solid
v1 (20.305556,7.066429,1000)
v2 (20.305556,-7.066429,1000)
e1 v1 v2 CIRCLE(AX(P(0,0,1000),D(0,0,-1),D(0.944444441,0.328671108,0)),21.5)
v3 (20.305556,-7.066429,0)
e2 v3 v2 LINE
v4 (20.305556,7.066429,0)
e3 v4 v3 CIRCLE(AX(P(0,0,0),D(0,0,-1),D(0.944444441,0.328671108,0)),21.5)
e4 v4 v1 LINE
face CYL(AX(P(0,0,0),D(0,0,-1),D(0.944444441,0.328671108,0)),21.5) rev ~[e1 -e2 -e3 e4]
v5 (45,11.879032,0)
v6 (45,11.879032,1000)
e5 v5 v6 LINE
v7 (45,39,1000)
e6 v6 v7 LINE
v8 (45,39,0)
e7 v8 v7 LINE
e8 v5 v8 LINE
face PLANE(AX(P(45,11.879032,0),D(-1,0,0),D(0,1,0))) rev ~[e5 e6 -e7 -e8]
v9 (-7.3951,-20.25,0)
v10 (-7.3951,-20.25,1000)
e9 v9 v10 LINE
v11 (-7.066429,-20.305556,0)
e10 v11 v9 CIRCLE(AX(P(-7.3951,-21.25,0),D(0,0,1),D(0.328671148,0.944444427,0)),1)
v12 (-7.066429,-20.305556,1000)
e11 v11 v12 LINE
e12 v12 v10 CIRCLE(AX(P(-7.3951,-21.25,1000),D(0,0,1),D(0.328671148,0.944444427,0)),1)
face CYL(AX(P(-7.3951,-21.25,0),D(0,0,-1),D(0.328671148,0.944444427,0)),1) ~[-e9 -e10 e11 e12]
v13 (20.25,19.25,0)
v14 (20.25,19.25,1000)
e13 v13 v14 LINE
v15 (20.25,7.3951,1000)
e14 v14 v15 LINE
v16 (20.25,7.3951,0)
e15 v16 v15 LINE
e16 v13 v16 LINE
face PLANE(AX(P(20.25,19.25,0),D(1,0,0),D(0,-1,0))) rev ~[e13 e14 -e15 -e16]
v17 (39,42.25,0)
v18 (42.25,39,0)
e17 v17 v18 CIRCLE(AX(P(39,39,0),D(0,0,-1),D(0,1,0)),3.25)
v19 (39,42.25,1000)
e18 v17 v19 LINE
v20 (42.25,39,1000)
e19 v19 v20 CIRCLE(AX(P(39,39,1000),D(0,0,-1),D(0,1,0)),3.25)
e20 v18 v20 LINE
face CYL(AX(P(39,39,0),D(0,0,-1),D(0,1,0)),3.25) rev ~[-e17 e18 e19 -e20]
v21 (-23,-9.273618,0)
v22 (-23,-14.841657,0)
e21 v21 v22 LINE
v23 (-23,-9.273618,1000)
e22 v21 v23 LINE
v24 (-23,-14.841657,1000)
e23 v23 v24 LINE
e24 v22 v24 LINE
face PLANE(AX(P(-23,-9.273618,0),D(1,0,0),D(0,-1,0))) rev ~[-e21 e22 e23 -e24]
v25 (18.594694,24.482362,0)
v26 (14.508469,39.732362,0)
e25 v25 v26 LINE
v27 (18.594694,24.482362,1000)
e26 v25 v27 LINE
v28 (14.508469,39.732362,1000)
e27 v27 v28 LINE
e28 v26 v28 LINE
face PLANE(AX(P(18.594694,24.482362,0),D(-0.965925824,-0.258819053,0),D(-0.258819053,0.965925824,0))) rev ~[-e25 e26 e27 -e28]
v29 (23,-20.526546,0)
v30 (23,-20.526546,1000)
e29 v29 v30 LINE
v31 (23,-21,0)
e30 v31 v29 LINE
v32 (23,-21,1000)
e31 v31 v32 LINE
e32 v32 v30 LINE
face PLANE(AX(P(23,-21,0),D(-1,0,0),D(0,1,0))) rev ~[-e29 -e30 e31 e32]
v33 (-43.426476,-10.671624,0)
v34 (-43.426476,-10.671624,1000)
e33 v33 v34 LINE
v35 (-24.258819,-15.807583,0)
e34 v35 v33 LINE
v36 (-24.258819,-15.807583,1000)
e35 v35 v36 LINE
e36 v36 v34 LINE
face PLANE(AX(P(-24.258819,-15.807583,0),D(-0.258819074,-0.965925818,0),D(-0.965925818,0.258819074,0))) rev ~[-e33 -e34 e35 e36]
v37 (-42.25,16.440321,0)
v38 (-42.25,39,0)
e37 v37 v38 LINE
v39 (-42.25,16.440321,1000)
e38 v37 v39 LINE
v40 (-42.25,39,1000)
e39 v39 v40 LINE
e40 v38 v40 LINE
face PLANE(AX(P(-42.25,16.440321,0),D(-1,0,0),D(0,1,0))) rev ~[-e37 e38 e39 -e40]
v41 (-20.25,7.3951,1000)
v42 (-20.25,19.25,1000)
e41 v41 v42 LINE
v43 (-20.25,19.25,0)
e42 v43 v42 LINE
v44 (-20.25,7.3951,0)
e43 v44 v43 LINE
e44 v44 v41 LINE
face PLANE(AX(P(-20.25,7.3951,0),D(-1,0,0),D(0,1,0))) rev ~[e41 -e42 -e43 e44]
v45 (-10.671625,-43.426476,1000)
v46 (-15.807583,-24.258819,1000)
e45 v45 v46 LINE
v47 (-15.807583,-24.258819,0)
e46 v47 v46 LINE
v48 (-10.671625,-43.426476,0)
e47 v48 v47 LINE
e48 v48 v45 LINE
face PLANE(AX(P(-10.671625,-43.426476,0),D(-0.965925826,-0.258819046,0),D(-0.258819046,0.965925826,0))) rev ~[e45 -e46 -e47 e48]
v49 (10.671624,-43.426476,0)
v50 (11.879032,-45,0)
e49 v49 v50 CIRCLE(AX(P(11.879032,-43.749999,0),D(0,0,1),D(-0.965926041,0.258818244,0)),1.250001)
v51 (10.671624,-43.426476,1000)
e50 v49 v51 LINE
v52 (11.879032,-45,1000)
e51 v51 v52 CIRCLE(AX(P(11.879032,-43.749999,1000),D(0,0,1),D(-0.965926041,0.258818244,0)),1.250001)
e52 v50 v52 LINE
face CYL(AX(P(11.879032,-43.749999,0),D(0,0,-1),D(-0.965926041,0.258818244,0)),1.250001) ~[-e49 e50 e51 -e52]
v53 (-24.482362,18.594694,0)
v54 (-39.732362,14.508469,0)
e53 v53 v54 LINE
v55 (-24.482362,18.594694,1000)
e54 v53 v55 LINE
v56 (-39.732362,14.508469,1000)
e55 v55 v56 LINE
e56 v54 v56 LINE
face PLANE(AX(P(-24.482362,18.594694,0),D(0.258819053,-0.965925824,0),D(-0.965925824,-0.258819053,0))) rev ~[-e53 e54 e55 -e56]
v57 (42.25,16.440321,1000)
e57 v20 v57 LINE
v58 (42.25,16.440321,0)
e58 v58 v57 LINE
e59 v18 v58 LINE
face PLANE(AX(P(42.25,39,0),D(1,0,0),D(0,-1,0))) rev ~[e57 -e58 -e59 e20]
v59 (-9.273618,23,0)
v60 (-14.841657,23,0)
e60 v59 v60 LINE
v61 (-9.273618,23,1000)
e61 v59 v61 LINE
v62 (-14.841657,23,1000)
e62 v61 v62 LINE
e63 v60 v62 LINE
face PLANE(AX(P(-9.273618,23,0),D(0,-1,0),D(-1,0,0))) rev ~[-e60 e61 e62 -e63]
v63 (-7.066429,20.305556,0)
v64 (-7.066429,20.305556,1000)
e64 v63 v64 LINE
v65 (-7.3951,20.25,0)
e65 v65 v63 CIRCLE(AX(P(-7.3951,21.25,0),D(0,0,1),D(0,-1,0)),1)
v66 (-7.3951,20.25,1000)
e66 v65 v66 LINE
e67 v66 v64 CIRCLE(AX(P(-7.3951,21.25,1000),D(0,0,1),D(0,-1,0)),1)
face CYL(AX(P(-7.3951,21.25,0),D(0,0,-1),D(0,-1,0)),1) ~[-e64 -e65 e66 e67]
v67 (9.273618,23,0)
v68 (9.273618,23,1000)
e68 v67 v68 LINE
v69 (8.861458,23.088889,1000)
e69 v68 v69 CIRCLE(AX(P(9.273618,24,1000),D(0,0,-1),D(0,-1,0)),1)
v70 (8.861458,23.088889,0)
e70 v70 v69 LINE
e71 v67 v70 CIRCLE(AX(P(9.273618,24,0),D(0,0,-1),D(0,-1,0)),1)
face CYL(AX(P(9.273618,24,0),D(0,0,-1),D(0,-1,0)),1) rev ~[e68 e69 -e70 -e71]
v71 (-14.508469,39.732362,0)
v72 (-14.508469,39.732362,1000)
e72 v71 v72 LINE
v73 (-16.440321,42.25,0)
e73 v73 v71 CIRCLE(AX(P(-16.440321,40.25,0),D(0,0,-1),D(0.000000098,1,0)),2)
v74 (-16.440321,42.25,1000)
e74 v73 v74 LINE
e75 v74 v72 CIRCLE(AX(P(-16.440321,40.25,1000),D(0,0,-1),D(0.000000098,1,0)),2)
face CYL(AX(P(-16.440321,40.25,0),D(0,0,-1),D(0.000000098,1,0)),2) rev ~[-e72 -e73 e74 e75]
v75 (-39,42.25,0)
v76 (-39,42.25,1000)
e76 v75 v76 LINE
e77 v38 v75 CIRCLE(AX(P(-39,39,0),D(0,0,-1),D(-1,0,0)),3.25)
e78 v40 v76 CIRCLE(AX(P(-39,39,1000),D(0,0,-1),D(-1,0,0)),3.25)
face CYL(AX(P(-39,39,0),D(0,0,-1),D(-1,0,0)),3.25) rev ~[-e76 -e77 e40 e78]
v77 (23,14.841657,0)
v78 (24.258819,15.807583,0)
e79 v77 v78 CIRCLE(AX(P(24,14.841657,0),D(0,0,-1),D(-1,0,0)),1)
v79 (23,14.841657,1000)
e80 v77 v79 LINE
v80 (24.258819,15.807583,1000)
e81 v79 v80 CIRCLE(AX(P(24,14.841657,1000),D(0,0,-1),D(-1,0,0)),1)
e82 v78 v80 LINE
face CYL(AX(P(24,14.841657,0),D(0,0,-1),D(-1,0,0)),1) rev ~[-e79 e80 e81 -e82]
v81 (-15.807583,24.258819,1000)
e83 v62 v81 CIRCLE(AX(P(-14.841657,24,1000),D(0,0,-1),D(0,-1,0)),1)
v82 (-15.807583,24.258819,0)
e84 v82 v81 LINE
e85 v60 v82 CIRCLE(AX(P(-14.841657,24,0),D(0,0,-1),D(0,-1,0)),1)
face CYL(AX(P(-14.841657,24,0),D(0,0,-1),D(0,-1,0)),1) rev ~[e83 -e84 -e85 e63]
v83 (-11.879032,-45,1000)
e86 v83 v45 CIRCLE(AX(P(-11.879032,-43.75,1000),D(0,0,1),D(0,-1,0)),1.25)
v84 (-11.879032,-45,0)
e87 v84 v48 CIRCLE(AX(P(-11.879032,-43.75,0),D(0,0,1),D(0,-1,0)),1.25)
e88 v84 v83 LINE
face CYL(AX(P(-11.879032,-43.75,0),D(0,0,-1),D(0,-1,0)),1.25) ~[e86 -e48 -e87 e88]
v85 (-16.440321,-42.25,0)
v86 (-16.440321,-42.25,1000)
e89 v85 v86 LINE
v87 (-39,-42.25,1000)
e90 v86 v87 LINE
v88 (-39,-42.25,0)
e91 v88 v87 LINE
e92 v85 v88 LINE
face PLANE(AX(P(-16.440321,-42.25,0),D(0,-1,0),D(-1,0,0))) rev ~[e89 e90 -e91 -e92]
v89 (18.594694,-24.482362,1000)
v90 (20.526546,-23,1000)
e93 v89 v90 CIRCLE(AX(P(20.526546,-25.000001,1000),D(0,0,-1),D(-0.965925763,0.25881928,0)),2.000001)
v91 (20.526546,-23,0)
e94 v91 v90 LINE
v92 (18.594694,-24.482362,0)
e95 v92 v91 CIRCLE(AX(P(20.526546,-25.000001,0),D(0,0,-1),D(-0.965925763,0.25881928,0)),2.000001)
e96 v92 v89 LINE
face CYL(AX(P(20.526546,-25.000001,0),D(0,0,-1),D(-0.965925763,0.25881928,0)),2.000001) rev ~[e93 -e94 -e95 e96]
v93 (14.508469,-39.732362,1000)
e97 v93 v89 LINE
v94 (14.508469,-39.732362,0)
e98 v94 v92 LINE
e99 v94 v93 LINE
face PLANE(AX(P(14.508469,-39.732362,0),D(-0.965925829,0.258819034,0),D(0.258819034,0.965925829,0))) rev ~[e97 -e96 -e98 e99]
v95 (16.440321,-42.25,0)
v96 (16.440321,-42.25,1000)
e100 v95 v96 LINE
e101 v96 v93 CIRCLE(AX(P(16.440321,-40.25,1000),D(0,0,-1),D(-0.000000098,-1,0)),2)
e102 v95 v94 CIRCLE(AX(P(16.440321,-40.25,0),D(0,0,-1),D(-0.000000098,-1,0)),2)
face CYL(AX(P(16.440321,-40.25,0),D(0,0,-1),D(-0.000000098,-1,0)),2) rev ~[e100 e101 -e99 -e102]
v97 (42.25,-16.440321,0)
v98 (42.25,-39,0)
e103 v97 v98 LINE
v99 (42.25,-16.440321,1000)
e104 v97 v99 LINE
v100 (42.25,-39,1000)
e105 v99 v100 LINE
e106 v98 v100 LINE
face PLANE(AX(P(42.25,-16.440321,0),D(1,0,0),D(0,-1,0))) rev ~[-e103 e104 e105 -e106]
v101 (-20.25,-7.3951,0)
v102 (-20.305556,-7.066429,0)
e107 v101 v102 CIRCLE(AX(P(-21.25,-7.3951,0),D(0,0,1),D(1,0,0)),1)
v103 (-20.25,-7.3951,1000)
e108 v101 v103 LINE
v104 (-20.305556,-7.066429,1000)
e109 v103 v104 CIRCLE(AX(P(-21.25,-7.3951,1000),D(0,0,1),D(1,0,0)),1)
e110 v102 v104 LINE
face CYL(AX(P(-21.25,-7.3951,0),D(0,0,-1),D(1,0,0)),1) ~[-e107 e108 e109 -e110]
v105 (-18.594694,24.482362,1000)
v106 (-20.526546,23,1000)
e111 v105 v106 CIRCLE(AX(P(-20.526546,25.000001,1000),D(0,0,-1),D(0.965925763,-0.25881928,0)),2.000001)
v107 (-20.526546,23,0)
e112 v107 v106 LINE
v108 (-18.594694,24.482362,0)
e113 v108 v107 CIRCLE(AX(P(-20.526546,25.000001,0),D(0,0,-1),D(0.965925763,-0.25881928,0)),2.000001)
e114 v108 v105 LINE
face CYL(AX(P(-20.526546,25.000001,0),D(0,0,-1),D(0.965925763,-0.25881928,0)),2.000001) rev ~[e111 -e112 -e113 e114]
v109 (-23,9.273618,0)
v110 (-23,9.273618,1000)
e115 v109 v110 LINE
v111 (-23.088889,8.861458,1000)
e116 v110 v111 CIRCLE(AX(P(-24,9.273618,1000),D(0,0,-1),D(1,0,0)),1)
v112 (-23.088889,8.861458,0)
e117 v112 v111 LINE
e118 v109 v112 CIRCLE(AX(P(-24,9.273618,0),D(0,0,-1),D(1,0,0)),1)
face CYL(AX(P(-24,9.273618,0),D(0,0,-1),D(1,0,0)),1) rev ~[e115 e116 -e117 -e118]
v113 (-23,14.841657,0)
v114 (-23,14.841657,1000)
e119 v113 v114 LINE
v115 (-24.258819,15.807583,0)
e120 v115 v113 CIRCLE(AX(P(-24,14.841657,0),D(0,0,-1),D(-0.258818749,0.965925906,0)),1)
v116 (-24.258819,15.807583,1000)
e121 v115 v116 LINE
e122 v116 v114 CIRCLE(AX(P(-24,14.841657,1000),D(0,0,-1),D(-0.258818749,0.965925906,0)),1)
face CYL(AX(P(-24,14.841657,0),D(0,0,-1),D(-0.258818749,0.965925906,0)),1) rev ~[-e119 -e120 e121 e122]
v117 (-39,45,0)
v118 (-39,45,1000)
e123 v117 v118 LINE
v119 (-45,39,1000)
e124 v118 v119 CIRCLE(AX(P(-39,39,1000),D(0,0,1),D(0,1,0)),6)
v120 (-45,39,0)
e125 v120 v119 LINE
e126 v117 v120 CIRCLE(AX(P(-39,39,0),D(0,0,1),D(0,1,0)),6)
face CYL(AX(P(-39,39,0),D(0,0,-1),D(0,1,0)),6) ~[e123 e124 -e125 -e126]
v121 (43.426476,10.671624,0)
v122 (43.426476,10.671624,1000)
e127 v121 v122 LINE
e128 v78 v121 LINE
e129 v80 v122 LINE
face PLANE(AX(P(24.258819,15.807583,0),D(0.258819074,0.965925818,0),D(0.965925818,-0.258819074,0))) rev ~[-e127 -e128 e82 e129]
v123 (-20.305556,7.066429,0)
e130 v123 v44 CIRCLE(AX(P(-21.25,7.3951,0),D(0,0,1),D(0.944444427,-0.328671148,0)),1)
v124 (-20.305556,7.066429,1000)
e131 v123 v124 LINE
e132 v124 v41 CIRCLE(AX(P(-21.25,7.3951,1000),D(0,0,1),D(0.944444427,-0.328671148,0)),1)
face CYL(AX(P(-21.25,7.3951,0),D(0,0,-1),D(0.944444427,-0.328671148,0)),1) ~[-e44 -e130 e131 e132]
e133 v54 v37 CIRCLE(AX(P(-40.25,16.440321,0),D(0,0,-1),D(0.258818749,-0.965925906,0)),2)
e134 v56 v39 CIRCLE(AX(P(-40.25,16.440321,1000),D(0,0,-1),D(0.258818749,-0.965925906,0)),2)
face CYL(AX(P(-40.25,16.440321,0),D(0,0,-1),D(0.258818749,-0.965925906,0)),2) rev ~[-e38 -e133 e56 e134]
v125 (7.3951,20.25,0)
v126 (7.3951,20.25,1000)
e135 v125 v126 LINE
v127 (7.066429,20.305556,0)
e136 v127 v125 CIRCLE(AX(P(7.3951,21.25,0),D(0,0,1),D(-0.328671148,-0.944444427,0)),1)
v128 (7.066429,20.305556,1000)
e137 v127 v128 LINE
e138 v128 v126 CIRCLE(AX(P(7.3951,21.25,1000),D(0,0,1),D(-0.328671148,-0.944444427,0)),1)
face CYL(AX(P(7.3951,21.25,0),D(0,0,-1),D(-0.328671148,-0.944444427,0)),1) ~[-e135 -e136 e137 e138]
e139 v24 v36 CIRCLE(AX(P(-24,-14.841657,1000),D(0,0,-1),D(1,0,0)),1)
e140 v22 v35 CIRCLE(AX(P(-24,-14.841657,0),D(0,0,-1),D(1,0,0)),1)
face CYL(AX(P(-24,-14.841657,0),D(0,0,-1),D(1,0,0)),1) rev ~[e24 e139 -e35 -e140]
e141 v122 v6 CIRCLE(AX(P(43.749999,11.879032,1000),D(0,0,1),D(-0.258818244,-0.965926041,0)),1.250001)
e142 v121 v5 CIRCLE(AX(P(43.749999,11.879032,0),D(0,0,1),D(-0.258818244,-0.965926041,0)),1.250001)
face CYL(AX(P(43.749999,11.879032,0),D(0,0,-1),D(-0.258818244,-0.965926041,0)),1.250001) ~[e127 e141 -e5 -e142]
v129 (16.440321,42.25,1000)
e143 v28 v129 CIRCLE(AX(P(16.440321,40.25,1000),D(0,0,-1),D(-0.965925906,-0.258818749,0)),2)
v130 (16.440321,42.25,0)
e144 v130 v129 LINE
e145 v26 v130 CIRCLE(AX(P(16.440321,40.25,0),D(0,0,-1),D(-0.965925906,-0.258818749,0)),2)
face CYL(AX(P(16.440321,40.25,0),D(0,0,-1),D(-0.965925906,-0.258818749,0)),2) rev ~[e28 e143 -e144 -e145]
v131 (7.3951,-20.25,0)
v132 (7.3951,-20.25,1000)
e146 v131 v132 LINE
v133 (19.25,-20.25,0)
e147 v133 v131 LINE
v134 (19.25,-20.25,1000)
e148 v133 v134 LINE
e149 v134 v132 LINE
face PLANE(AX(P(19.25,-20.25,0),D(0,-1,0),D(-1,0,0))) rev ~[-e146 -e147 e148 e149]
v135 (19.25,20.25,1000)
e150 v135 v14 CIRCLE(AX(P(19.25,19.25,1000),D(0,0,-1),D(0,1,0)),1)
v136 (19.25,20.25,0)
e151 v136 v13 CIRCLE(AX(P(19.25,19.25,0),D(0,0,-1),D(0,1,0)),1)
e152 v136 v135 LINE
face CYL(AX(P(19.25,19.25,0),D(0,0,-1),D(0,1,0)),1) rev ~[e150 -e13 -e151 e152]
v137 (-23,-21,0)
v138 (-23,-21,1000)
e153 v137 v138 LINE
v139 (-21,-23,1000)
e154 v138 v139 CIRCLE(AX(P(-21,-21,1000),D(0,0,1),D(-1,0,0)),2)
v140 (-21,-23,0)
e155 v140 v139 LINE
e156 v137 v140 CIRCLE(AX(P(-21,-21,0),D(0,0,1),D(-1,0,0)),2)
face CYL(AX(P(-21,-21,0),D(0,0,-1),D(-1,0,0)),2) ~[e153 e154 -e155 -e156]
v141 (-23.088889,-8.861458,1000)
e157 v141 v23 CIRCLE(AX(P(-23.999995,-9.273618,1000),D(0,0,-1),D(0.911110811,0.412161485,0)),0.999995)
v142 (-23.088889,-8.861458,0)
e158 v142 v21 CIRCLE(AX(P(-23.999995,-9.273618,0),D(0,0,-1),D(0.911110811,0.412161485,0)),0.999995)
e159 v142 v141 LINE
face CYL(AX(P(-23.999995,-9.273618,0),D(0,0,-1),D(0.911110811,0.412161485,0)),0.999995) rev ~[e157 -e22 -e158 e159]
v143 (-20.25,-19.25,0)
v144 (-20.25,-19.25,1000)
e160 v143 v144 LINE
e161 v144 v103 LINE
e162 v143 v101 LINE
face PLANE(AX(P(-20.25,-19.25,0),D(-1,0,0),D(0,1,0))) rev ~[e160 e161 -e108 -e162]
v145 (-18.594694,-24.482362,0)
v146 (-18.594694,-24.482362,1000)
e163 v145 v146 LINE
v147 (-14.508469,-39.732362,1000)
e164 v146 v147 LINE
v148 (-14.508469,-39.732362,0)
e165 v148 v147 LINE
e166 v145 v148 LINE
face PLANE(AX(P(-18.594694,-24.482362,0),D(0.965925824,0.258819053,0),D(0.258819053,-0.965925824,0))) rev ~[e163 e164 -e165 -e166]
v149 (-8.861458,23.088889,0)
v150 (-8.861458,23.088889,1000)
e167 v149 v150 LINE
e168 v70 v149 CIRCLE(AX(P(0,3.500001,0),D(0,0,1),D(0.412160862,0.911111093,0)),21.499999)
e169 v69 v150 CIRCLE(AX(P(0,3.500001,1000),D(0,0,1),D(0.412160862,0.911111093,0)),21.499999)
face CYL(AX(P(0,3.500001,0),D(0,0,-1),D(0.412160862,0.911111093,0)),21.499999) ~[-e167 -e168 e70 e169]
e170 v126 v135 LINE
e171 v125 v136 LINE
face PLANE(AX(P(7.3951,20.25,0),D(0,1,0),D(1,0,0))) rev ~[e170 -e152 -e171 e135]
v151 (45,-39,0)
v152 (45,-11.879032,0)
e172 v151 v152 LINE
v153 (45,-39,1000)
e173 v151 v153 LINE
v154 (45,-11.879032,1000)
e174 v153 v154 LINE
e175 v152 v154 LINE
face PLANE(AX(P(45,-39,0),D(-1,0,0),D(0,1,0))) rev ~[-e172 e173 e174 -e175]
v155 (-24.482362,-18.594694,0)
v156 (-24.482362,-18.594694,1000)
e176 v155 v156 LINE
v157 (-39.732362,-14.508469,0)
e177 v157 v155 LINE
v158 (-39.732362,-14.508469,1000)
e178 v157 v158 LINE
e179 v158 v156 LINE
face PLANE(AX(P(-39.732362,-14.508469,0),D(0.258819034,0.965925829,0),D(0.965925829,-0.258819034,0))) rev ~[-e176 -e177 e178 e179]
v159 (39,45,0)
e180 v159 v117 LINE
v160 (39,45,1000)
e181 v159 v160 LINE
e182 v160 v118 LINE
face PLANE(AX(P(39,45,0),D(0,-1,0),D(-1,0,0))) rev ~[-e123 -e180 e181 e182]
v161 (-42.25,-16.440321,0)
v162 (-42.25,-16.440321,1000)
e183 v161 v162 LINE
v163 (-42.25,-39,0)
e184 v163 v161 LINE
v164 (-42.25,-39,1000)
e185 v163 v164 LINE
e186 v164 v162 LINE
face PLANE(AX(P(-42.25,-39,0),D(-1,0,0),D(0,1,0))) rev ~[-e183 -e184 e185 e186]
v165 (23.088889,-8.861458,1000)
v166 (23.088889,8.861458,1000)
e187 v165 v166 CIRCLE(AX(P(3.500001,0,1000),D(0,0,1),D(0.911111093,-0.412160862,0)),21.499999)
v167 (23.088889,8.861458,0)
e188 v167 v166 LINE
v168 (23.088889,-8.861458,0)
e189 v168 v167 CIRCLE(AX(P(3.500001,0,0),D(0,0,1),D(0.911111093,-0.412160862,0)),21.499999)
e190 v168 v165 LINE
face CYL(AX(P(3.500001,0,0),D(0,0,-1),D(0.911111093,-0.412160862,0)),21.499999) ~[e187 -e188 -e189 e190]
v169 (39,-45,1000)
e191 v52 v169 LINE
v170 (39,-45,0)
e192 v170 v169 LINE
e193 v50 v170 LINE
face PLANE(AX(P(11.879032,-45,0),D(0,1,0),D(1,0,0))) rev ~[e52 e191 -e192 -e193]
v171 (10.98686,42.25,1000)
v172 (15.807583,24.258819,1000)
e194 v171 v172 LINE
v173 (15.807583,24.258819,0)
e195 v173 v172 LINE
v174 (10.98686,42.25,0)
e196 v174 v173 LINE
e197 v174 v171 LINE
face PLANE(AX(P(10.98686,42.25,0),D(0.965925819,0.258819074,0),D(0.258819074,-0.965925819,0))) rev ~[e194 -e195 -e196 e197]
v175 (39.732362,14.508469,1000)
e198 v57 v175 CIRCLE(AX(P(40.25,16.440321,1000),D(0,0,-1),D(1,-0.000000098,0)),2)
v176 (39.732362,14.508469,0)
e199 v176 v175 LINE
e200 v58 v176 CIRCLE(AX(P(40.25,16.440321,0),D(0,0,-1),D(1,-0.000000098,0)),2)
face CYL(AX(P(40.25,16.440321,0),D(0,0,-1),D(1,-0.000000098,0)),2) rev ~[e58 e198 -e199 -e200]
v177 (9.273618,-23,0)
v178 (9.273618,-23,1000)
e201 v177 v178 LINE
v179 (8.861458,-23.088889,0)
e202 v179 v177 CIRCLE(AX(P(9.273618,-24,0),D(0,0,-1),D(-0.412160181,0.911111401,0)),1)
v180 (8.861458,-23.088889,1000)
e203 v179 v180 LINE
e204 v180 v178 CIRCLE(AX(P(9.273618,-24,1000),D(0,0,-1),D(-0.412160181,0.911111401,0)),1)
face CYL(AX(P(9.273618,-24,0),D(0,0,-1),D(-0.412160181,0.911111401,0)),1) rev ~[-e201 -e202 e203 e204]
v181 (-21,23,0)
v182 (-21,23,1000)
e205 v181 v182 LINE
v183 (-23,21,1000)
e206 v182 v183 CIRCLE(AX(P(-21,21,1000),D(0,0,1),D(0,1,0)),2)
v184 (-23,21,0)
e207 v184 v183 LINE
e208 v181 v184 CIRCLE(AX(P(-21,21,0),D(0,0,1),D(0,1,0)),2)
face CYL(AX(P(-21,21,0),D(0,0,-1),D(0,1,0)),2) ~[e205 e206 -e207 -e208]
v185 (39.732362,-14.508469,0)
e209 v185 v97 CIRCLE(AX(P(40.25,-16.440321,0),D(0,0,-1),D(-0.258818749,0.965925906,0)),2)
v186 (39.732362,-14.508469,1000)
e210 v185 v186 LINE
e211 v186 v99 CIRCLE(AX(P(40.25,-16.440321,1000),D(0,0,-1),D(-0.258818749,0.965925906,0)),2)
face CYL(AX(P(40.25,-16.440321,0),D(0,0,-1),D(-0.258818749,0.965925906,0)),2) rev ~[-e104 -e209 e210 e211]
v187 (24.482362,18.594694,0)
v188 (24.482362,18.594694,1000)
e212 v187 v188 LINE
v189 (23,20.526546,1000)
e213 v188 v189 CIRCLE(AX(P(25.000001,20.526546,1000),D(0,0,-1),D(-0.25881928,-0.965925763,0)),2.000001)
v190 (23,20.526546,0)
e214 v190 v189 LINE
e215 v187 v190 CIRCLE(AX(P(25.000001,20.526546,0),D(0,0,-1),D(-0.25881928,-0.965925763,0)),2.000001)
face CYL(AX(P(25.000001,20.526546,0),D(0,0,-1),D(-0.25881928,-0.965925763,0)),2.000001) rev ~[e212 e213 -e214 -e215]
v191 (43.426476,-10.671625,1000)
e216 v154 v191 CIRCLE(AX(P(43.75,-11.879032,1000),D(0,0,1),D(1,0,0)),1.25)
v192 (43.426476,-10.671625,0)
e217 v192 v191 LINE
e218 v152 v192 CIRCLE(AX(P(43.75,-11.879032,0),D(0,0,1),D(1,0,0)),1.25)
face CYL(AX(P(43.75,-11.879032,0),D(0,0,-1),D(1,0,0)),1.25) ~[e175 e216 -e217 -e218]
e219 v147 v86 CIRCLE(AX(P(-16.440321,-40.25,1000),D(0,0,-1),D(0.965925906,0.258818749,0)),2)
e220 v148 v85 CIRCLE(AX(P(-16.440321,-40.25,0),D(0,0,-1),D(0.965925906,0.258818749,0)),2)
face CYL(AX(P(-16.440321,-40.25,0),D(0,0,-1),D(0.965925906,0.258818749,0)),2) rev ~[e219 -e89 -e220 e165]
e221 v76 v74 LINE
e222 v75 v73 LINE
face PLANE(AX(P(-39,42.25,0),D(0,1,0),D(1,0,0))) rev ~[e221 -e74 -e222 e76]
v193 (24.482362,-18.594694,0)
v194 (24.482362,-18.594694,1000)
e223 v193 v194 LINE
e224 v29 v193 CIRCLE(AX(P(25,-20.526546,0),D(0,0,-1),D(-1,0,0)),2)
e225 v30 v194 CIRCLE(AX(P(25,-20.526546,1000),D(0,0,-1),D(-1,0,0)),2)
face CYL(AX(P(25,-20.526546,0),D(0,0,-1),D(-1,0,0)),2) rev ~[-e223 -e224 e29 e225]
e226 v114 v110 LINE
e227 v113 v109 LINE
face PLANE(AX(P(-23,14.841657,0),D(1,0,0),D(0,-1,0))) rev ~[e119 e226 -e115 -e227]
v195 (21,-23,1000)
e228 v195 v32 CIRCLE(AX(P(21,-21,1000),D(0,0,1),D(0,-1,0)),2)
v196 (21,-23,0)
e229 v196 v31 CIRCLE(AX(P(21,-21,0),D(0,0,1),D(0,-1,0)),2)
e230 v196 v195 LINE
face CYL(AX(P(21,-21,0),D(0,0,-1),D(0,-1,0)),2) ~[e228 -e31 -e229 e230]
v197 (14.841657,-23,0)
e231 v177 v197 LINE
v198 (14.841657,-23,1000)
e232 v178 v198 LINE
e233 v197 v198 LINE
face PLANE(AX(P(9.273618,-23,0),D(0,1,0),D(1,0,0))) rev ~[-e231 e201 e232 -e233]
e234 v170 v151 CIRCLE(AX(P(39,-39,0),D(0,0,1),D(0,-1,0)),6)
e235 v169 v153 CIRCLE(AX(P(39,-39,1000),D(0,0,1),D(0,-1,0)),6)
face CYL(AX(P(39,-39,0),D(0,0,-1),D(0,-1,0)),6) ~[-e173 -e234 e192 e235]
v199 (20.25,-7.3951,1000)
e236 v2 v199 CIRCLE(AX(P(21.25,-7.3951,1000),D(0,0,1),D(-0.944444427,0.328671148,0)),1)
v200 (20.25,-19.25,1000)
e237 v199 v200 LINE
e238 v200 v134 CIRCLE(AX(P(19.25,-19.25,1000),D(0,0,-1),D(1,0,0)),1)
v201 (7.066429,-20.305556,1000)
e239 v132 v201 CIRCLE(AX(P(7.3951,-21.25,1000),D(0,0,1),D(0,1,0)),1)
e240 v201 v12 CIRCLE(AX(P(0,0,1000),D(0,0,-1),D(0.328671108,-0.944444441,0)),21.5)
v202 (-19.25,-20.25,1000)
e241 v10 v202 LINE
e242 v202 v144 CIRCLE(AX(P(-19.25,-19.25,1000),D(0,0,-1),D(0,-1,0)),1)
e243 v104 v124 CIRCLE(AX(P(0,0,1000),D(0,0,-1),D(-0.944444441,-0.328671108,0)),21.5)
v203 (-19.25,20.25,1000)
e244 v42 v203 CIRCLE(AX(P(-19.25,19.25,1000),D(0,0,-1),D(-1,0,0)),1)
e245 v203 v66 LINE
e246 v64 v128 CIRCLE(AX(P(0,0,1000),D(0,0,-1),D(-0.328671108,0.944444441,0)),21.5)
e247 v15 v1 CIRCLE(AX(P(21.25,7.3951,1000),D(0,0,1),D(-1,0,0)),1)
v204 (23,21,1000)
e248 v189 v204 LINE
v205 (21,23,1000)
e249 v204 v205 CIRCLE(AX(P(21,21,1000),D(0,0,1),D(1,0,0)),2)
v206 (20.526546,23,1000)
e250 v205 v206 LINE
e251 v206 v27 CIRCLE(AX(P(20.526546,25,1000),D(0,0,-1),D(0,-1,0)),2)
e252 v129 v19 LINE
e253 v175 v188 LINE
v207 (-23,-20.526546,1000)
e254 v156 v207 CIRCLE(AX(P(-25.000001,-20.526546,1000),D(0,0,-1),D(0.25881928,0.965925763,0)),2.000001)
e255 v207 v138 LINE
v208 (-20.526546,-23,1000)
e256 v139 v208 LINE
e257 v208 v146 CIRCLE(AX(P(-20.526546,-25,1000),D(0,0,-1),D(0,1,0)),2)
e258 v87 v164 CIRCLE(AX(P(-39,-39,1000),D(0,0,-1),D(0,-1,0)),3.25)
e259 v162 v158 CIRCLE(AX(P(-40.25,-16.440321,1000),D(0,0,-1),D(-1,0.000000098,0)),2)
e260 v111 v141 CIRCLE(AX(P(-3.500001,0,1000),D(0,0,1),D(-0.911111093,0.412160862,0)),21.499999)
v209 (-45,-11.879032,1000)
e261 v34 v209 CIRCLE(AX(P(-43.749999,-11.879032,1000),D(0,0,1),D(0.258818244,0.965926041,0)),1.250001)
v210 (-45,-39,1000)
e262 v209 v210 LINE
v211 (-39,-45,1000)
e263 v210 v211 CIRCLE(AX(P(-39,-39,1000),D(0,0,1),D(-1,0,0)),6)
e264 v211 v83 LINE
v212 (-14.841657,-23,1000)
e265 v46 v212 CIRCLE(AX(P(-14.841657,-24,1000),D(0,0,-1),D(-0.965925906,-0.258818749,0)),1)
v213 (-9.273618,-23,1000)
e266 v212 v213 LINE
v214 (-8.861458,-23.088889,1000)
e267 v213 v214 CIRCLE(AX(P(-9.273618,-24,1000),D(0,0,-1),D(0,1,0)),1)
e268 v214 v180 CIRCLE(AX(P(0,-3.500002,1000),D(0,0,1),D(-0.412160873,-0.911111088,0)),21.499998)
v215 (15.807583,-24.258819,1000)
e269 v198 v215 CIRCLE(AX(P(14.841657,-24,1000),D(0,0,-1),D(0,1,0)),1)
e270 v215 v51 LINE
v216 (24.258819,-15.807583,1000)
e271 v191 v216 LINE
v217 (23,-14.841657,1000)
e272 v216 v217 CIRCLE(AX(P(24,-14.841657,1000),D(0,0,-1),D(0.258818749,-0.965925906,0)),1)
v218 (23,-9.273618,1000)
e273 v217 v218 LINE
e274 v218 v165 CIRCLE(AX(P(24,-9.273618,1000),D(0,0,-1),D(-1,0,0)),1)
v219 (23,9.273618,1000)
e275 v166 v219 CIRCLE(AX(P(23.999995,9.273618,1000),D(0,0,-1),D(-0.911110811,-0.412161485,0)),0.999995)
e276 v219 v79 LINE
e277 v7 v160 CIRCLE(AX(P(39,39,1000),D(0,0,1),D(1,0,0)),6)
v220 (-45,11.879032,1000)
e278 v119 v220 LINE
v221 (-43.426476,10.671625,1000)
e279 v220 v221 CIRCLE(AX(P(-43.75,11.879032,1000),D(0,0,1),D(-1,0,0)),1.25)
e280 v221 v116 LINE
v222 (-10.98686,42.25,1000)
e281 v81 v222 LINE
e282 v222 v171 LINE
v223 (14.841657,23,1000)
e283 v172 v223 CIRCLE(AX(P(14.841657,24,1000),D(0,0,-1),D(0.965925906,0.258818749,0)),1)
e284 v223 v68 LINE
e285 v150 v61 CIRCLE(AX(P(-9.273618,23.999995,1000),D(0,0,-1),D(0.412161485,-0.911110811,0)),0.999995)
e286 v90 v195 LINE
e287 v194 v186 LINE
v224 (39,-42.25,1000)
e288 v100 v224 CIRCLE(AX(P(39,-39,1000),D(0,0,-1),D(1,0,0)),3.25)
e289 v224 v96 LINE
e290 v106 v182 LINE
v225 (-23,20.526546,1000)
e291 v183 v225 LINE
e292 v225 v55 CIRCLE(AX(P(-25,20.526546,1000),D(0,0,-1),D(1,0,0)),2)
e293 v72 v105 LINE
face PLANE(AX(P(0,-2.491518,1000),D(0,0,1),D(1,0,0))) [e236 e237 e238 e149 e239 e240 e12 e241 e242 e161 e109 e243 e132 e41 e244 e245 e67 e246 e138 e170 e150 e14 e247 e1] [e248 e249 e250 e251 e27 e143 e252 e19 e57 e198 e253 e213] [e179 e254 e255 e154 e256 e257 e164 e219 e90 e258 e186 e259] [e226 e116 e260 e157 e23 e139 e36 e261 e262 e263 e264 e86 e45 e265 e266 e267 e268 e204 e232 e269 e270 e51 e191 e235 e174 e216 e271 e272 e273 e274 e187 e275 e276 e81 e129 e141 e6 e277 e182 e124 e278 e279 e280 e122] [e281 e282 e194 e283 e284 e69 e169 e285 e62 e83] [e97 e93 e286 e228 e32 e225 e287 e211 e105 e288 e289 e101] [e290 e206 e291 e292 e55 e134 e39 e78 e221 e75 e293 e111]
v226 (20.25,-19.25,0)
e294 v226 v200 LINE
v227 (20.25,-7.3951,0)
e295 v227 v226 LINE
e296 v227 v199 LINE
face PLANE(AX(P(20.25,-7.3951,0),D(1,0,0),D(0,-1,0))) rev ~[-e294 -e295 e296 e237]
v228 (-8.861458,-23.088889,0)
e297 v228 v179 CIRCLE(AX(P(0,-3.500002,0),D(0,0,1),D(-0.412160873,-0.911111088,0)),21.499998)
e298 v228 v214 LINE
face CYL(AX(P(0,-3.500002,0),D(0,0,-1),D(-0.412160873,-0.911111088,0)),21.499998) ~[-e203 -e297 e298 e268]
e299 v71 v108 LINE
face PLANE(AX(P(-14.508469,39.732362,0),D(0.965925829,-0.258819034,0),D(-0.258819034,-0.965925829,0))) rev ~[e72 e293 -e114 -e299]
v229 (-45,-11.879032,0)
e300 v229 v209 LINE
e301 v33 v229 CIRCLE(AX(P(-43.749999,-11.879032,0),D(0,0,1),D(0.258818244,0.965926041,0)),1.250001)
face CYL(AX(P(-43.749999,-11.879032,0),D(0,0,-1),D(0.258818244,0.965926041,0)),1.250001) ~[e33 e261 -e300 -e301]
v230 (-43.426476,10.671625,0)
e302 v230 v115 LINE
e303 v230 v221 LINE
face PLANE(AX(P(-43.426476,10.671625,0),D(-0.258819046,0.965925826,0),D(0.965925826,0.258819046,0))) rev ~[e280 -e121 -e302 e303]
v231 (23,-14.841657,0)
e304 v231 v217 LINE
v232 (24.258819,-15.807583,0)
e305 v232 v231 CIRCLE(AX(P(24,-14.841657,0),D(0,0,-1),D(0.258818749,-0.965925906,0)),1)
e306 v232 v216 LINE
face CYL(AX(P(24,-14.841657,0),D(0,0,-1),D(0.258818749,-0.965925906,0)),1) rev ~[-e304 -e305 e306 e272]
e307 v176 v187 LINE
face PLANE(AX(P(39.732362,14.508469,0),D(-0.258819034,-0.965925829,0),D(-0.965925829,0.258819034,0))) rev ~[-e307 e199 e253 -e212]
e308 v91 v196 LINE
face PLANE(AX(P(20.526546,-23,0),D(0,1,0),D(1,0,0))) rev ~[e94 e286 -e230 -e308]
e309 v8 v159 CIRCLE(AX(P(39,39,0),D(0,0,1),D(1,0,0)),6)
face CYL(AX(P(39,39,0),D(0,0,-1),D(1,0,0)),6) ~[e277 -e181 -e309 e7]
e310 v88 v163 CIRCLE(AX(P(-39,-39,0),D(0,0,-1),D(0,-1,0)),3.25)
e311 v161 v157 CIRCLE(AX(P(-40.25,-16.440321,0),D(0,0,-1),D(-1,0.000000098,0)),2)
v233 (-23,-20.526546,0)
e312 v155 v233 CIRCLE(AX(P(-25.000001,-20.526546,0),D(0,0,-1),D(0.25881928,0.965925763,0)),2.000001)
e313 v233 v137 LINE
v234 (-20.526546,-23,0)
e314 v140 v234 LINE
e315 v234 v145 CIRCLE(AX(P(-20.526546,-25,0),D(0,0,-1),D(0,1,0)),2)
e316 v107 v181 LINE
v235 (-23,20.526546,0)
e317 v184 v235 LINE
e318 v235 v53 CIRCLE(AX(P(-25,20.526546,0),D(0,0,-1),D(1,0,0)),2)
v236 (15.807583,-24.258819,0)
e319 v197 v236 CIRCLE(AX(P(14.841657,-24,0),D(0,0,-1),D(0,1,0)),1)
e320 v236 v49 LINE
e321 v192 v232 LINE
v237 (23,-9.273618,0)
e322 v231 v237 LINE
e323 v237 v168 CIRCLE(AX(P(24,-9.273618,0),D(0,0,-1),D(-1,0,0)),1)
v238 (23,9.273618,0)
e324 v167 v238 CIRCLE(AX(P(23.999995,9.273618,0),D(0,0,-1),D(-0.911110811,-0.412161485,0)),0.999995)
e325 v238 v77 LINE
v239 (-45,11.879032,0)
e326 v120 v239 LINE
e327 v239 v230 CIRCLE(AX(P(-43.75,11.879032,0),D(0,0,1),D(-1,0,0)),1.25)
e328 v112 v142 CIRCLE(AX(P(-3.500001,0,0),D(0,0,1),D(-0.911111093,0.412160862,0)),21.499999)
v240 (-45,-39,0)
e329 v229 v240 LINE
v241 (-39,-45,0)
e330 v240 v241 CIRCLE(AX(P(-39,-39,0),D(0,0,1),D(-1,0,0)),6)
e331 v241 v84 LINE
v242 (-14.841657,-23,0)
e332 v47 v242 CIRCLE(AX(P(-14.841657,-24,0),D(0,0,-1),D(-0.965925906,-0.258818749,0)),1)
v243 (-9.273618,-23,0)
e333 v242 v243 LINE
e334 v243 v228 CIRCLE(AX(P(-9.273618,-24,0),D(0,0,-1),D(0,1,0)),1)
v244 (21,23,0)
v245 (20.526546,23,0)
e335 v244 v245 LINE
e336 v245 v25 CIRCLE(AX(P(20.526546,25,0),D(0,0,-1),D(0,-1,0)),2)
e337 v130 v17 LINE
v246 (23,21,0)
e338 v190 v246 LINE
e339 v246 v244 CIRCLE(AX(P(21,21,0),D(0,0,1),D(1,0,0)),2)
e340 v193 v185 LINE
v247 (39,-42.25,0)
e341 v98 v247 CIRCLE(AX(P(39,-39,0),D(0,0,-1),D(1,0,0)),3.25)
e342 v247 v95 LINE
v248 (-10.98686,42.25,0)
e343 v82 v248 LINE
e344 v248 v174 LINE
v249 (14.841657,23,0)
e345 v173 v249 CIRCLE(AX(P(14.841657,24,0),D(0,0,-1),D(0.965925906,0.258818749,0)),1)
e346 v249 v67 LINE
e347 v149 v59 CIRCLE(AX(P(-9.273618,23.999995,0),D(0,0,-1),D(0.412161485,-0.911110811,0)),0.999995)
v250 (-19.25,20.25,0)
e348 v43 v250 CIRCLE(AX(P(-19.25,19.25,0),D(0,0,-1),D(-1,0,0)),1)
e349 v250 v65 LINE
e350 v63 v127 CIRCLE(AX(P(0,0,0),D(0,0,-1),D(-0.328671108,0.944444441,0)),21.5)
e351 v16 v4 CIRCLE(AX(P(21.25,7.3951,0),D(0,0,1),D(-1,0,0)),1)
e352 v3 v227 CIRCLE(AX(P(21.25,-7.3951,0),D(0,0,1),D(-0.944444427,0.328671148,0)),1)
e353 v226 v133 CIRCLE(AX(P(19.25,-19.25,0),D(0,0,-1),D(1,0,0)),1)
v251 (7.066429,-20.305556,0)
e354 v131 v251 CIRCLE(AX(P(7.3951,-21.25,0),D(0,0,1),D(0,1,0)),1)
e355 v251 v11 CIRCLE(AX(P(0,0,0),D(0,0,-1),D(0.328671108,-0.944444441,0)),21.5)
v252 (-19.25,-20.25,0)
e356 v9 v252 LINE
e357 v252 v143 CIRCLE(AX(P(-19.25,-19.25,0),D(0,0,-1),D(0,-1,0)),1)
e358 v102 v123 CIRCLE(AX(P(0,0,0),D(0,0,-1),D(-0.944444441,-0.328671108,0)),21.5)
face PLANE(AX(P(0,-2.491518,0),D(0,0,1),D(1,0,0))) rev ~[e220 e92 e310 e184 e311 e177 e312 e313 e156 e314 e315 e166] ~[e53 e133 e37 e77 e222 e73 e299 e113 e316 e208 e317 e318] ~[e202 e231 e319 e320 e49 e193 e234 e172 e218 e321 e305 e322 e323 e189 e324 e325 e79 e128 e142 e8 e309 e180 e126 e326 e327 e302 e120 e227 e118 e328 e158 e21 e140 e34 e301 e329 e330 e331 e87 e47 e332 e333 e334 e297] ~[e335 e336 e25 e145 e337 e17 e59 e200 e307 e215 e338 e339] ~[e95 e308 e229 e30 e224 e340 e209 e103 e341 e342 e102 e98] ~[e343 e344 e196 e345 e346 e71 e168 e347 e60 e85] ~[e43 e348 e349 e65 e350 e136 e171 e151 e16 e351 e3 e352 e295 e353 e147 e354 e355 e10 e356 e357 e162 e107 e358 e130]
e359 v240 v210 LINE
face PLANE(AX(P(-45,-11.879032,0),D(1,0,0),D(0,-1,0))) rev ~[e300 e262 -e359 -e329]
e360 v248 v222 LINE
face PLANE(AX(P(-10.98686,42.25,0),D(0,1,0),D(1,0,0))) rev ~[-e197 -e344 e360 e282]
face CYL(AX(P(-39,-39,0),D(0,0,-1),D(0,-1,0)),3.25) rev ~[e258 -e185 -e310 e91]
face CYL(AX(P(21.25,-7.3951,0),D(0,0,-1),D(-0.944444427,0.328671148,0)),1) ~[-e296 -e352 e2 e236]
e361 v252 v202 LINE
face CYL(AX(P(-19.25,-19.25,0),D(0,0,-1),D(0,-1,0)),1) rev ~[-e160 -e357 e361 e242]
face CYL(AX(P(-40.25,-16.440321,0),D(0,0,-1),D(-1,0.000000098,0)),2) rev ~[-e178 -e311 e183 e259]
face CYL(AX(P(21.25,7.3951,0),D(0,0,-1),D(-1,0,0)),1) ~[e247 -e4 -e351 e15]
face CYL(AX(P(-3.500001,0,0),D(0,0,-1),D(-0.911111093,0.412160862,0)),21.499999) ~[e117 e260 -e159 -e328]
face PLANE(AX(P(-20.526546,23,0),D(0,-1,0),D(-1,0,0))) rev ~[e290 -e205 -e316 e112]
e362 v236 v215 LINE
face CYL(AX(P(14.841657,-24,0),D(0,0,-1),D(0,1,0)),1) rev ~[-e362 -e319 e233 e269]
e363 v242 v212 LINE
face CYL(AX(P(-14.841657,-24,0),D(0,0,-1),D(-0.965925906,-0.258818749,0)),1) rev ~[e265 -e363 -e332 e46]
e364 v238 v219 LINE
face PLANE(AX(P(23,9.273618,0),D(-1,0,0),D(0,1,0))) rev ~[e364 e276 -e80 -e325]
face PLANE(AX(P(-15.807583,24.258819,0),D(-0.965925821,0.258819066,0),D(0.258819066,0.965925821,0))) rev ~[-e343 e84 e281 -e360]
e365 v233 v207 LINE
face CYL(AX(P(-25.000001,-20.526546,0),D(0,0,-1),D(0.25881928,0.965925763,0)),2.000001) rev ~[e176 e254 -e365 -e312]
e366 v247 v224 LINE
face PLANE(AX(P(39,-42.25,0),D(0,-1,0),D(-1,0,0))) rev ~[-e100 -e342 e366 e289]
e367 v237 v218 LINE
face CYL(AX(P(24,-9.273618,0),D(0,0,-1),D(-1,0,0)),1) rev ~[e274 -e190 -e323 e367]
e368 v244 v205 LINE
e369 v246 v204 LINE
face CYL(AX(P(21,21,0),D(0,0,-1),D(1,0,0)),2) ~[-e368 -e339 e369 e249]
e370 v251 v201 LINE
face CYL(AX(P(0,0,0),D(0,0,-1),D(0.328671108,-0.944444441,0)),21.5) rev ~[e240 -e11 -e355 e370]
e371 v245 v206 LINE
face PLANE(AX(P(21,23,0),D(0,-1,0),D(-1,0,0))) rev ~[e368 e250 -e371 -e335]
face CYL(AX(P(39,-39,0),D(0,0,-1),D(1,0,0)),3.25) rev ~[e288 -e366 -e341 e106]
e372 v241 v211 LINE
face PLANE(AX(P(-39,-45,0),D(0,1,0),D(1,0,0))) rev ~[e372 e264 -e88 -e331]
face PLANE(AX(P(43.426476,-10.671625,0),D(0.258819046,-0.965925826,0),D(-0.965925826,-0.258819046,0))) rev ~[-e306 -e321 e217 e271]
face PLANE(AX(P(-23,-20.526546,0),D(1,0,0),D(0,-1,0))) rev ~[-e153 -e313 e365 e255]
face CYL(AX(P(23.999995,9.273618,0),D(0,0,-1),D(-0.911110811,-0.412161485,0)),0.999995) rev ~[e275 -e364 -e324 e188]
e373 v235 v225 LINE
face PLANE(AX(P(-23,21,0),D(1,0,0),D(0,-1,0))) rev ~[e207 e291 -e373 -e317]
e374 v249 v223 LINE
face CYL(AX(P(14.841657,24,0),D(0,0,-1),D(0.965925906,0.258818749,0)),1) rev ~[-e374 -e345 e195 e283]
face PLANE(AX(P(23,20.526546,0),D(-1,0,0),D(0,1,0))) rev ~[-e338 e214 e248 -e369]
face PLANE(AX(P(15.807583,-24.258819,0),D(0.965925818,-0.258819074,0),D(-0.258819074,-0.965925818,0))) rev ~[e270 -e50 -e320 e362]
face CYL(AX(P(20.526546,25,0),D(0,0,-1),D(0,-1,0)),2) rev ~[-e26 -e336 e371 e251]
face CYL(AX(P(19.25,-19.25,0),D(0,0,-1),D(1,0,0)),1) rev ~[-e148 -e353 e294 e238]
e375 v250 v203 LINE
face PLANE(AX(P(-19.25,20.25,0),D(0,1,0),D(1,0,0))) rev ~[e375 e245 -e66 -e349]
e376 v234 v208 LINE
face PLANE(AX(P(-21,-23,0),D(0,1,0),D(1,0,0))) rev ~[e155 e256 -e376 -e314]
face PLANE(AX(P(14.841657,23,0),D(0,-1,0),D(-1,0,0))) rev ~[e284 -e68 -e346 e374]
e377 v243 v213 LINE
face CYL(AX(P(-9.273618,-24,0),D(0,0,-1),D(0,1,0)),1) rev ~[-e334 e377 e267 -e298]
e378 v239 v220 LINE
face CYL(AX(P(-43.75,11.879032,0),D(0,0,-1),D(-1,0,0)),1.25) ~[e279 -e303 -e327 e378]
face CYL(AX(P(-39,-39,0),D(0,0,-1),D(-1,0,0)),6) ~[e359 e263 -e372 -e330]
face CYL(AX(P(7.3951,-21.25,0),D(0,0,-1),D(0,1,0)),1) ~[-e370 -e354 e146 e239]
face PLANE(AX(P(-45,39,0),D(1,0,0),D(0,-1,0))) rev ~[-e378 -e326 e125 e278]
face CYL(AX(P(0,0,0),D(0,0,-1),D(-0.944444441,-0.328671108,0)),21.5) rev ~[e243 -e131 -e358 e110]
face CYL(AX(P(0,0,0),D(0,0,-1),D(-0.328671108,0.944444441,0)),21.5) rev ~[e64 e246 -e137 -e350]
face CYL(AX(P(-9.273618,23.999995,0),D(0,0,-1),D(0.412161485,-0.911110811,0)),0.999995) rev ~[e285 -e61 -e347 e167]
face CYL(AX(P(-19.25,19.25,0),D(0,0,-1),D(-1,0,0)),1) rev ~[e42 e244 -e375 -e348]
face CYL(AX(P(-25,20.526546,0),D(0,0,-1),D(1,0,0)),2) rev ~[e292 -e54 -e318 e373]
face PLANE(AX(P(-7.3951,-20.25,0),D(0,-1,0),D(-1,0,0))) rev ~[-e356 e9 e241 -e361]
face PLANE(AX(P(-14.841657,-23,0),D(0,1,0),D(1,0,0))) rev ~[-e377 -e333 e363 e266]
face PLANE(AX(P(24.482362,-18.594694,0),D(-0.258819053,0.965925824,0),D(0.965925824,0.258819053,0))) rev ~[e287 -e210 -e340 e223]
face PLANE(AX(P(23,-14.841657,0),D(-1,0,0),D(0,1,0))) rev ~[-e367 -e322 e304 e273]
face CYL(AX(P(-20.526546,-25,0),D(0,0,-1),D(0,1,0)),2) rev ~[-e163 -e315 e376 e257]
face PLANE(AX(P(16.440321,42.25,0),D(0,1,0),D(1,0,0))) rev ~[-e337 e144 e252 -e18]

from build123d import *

# Parameters (mm, degrees)
F1_DEPTH = 1000


# Not quite as in the source:
# - ends of sketch curves that miss each other by under 0.0002 mm in the source are joined


with BuildPart() as f1:
    # F0 (on Top) → F1 (new body)
    with BuildSketch(Plane.XY):
        with BuildLine():
            ThreePointArc((8.8614578186, -23.0888885991), (9.062799833, -23.022474706), (9.273618, -23))
            Line((9.273618, -23), (14.841657, -23))
            ThreePointArc((14.841657, -23), (15.6350103133, -23.3912385359), (15.8075828492, -24.2588189596))
            Line((15.8075828492, -24.2588189596), (10.671624, -43.426476))
            ThreePointArc((10.671624, -43.426476), (10.8873403242, -44.5109517857), (11.879032, -45))
            Line((11.879032, -45), (39, -45))
            ThreePointArc((39, -45), (43.2426406871, -43.2426406871), (45, -39))
            Line((45, -39), (45, -11.879032))
            ThreePointArc((45, -11.879032), (44.5109517857, -10.8873403242), (43.4264761923, -10.6716247175))
            Line((43.4264761923, -10.6716247175), (24.258819, -15.807583))
            ThreePointArc((24.258819, -15.807583), (23.3912385359, -15.6350103133), (23, -14.841657))
            Line((23, -14.841657), (23, -9.273618))
            ThreePointArc((23, -9.273618), (23.022474706, -9.062799833), (23.0888885991, -8.8614578186))
            ThreePointArc((23.0888885991, -8.8614578186), (25, 0), (23.0888887851, 8.8614579028))
            ThreePointArc((23.0888887851, 8.8614579028), (23.022474706, 9.062799833), (23, 9.273618))
            Line((23, 9.273618), (23, 14.841657))
            ThreePointArc((23, 14.841657), (23.3912385359, 15.6350103133), (24.2588189596, 15.8075828492))
            Line((24.2588189596, 15.8075828492), (43.426476, 10.671624))
            ThreePointArc((43.426476, 10.671624), (44.5109517857, 10.8873403242), (45, 11.879032))
            Line((45, 11.879032), (45, 39))
            ThreePointArc((45, 39), (43.2426406871, 43.2426406871), (39, 45))
            Line((39, 45), (-39, 45))
            ThreePointArc((-39, 45), (-43.2426406871, 43.2426406871), (-45, 39))
            Line((-45, 39), (-45, 11.879032))
            ThreePointArc((-45, 11.879032), (-44.5109517857, 10.8873403242), (-43.4264761923, 10.6716247175))
            Line((-43.4264761923, 10.6716247175), (-24.258819, 15.807583))
            ThreePointArc((-24.258819, 15.807583), (-23.3912385359, 15.6350103133), (-23, 14.841657))
            Line((-23, 14.841657), (-23, 9.273618))
            ThreePointArc((-23, 9.273618), (-23.022474706, 9.062799833), (-23.0888885991, 8.8614578186))
            ThreePointArc((-23.0888885991, 8.8614578186), (-25, 0), (-23.0888887851, -8.8614579028))
            ThreePointArc((-23.0888887851, -8.8614579028), (-23.022474706, -9.062799833), (-23, -9.273618))
            Line((-23, -9.273618), (-23, -14.841657))
            ThreePointArc((-23, -14.841657), (-23.3912385359, -15.6350103133), (-24.2588189596, -15.8075828492))
            Line((-24.2588189596, -15.8075828492), (-43.426476, -10.671624))
            ThreePointArc((-43.426476, -10.671624), (-44.5109517857, -10.8873403242), (-45, -11.879032))
            Line((-45, -11.879032), (-45, -39))
            ThreePointArc((-45, -39), (-43.2426406871, -43.2426406871), (-39, -45))
            Line((-39, -45), (-11.879032, -45))
            ThreePointArc((-11.879032, -45), (-10.8873403242, -44.5109517857), (-10.6716247175, -43.4264761923))
            Line((-10.6716247175, -43.4264761923), (-15.807583, -24.258819))
            ThreePointArc((-15.807583, -24.258819), (-15.6350103133, -23.3912385359), (-14.841657, -23))
            Line((-14.841657, -23), (-9.273618, -23))
            ThreePointArc((-9.273618, -23), (-9.062799833, -23.022474706), (-8.8614578186, -23.0888885991))
            ThreePointArc((-8.8614578186, -23.0888885991), (0, -25), (8.8614578186, -23.0888885991))
        make_face()
        with BuildLine():
            Line((-39.732362, -14.508469), (-24.482362, -18.594694))
            ThreePointArc((-24.482362, -18.594694), (-23.4132933733, -19.3090230718), (-23, -20.526546))
            Line((-23, -20.526546), (-23, -21))
            ThreePointArc((-23, -21), (-22.4142135624, -22.4142135624), (-21, -23))
            Line((-21, -23), (-20.526546, -23))
            ThreePointArc((-20.526546, -23), (-19.3090230718, -23.4132933733), (-18.5946943016, -24.4823620808))
            Line((-18.5946943016, -24.4823620808), (-14.508469, -39.732362))
            ThreePointArc((-14.508469, -39.732362), (-14.8536143733, -41.4675229282), (-16.440321, -42.25))
            Line((-16.440321, -42.25), (-39, -42.25))
            ThreePointArc((-39, -42.25), (-41.2980970389, -41.2980970389), (-42.25, -39))
            Line((-42.25, -39), (-42.25, -16.440321))
            ThreePointArc((-42.25, -16.440321), (-41.4675229282, -14.8536143733), (-39.732362, -14.508469))
        make_face(mode=Mode.SUBTRACT)
        with BuildLine():
            Line((14.508469, -39.732362), (18.594694, -24.482362))
            ThreePointArc((18.594694, -24.482362), (19.3090230718, -23.4132933733), (20.526546, -23))
            Line((20.526546, -23), (21, -23))
            ThreePointArc((21, -23), (22.4142135624, -22.4142135624), (23, -21))
            Line((23, -21), (23, -20.526546))
            ThreePointArc((23, -20.526546), (23.4132933733, -19.3090230718), (24.4823620808, -18.5946943016))
            Line((24.4823620808, -18.5946943016), (39.732362, -14.508469))
            ThreePointArc((39.732362, -14.508469), (41.4675229282, -14.8536143733), (42.25, -16.440321))
            Line((42.25, -16.440321), (42.25, -39))
            ThreePointArc((42.25, -39), (41.2980970389, -41.2980970389), (39, -42.25))
            Line((39, -42.25), (16.440321, -42.25))
            ThreePointArc((16.440321, -42.25), (14.8536143733, -41.4675229282), (14.508469, -39.732362))
        make_face(mode=Mode.SUBTRACT)
        with BuildLine():
            Line((-7.3951, -20.25), (-19.25, -20.25))
            ThreePointArc((-19.25, -20.25), (-19.9571067812, -19.9571067812), (-20.25, -19.25))
            Line((-20.25, -19.25), (-20.25, -7.3951))
            ThreePointArc((-20.25, -7.3951), (-20.2639867072, -7.2284333074), (-20.3055555728, -7.0664288513))
            ThreePointArc((-20.3055554887, -7.066428822), (-21.5, 0), (-20.3055554887, 7.066428822))
            ThreePointArc((-20.3055555728, 7.0664288513), (-20.2639867072, 7.2284333074), (-20.25, 7.3951))
            Line((-20.25, 7.3951), (-20.25, 19.25))
            ThreePointArc((-20.25, 19.25), (-19.9571067812, 19.9571067812), (-19.25, 20.25))
            Line((-19.25, 20.25), (-7.3951, 20.25))
            ThreePointArc((-7.3951, 20.25), (-7.2284333074, 20.2639867072), (-7.0664288513, 20.3055555728))
            ThreePointArc((-7.066428822, 20.3055554887), (0, 21.5), (7.066428822, 20.3055554887))
            ThreePointArc((7.0664288513, 20.3055555728), (7.2284333074, 20.2639867072), (7.3951, 20.25))
            Line((7.3951, 20.25), (19.25, 20.25))
            ThreePointArc((19.25, 20.25), (19.9571067812, 19.9571067812), (20.25, 19.25))
            Line((20.25, 19.25), (20.25, 7.3951))
            ThreePointArc((20.25, 7.3951), (20.2639867072, 7.2284333074), (20.3055555728, 7.0664288513))
            ThreePointArc((20.3055554887, 7.066428822), (21.5, 0), (20.3055554887, -7.066428822))
            ThreePointArc((20.3055555728, -7.0664288513), (20.2639867072, -7.2284333074), (20.25, -7.3951))
            Line((20.25, -7.3951), (20.25, -19.25))
            ThreePointArc((20.25, -19.25), (19.9571067812, -19.9571067812), (19.25, -20.25))
            Line((19.25, -20.25), (7.3951, -20.25))
            ThreePointArc((7.3951, -20.25), (7.2284333074, -20.2639867072), (7.0664288513, -20.3055555728))
            ThreePointArc((7.066428822, -20.3055554887), (0, -21.5), (-7.066428822, -20.3055554887))
            ThreePointArc((-7.0664288513, -20.3055555728), (-7.2284333074, -20.2639867072), (-7.3951, -20.25))
        make_face(mode=Mode.SUBTRACT)
        with BuildLine():
            Line((-14.508469, 39.732362), (-18.594694, 24.482362))
            ThreePointArc((-18.594694, 24.482362), (-19.3090230718, 23.4132933733), (-20.526546, 23))
            Line((-20.526546, 23), (-21, 23))
            ThreePointArc((-21, 23), (-22.4142135624, 22.4142135624), (-23, 21))
            Line((-23, 21), (-23, 20.526546))
            ThreePointArc((-23, 20.526546), (-23.4132933733, 19.3090230718), (-24.4823620808, 18.5946943016))
            Line((-24.4823620808, 18.5946943016), (-39.732362, 14.508469))
            ThreePointArc((-39.732362, 14.508469), (-41.4675229282, 14.8536143733), (-42.25, 16.440321))
            Line((-42.25, 16.440321), (-42.25, 39))
            ThreePointArc((-42.25, 39), (-41.2980970389, 41.2980970389), (-39, 42.25))
            Line((-39, 42.25), (-16.440321, 42.25))
            ThreePointArc((-16.440321, 42.25), (-14.8536143733, 41.4675229282), (-14.508469, 39.732362))
        make_face(mode=Mode.SUBTRACT)
        with BuildLine():
            Line((-9.273618, 23), (-14.841657, 23))
            ThreePointArc((-14.841657, 23), (-15.6350103133, 23.3912385359), (-15.8075828492, 24.2588189596))
            Line((-15.8075828492, 24.2588189596), (-10.98686, 42.25))
            Line((-10.98686, 42.25), (10.98686, 42.25))
            Line((10.98686, 42.25), (15.807583, 24.258819))
            ThreePointArc((15.807583, 24.258819), (15.6350103133, 23.3912385359), (14.841657, 23))
            Line((14.841657, 23), (9.273618, 23))
            ThreePointArc((9.273618, 23), (9.062799833, 23.022474706), (8.8614578186, 23.0888885991))
            ThreePointArc((8.8614578186, 23.0888885991), (0, 25), (-8.8614579028, 23.0888887851))
            ThreePointArc((-8.8614579028, 23.0888887851), (-9.062799833, 23.022474706), (-9.273618, 23))
        make_face(mode=Mode.SUBTRACT)
        with BuildLine():
            Line((39.732362, 14.508469), (24.482362, 18.594694))
            ThreePointArc((24.482362, 18.594694), (23.4132933733, 19.3090230718), (23, 20.526546))
            Line((23, 20.526546), (23, 21))
            ThreePointArc((23, 21), (22.4142135624, 22.4142135624), (21, 23))
            Line((21, 23), (20.526546, 23))
            ThreePointArc((20.526546, 23), (19.3090230718, 23.4132933733), (18.5946943016, 24.4823620808))
            Line((18.5946943016, 24.4823620808), (14.508469, 39.732362))
            ThreePointArc((14.508469, 39.732362), (14.8536143733, 41.4675229282), (16.440321, 42.25))
            Line((16.440321, 42.25), (39, 42.25))
            ThreePointArc((39, 42.25), (41.2980970389, 41.2980970389), (42.25, 39))
            Line((42.25, 39), (42.25, 16.440321))
            ThreePointArc((42.25, 16.440321), (41.4675229282, 14.8536143733), (39.732362, 14.508469))
        make_face(mode=Mode.SUBTRACT)
    extrude(amount=F1_DEPTH)


solid = f1.part
